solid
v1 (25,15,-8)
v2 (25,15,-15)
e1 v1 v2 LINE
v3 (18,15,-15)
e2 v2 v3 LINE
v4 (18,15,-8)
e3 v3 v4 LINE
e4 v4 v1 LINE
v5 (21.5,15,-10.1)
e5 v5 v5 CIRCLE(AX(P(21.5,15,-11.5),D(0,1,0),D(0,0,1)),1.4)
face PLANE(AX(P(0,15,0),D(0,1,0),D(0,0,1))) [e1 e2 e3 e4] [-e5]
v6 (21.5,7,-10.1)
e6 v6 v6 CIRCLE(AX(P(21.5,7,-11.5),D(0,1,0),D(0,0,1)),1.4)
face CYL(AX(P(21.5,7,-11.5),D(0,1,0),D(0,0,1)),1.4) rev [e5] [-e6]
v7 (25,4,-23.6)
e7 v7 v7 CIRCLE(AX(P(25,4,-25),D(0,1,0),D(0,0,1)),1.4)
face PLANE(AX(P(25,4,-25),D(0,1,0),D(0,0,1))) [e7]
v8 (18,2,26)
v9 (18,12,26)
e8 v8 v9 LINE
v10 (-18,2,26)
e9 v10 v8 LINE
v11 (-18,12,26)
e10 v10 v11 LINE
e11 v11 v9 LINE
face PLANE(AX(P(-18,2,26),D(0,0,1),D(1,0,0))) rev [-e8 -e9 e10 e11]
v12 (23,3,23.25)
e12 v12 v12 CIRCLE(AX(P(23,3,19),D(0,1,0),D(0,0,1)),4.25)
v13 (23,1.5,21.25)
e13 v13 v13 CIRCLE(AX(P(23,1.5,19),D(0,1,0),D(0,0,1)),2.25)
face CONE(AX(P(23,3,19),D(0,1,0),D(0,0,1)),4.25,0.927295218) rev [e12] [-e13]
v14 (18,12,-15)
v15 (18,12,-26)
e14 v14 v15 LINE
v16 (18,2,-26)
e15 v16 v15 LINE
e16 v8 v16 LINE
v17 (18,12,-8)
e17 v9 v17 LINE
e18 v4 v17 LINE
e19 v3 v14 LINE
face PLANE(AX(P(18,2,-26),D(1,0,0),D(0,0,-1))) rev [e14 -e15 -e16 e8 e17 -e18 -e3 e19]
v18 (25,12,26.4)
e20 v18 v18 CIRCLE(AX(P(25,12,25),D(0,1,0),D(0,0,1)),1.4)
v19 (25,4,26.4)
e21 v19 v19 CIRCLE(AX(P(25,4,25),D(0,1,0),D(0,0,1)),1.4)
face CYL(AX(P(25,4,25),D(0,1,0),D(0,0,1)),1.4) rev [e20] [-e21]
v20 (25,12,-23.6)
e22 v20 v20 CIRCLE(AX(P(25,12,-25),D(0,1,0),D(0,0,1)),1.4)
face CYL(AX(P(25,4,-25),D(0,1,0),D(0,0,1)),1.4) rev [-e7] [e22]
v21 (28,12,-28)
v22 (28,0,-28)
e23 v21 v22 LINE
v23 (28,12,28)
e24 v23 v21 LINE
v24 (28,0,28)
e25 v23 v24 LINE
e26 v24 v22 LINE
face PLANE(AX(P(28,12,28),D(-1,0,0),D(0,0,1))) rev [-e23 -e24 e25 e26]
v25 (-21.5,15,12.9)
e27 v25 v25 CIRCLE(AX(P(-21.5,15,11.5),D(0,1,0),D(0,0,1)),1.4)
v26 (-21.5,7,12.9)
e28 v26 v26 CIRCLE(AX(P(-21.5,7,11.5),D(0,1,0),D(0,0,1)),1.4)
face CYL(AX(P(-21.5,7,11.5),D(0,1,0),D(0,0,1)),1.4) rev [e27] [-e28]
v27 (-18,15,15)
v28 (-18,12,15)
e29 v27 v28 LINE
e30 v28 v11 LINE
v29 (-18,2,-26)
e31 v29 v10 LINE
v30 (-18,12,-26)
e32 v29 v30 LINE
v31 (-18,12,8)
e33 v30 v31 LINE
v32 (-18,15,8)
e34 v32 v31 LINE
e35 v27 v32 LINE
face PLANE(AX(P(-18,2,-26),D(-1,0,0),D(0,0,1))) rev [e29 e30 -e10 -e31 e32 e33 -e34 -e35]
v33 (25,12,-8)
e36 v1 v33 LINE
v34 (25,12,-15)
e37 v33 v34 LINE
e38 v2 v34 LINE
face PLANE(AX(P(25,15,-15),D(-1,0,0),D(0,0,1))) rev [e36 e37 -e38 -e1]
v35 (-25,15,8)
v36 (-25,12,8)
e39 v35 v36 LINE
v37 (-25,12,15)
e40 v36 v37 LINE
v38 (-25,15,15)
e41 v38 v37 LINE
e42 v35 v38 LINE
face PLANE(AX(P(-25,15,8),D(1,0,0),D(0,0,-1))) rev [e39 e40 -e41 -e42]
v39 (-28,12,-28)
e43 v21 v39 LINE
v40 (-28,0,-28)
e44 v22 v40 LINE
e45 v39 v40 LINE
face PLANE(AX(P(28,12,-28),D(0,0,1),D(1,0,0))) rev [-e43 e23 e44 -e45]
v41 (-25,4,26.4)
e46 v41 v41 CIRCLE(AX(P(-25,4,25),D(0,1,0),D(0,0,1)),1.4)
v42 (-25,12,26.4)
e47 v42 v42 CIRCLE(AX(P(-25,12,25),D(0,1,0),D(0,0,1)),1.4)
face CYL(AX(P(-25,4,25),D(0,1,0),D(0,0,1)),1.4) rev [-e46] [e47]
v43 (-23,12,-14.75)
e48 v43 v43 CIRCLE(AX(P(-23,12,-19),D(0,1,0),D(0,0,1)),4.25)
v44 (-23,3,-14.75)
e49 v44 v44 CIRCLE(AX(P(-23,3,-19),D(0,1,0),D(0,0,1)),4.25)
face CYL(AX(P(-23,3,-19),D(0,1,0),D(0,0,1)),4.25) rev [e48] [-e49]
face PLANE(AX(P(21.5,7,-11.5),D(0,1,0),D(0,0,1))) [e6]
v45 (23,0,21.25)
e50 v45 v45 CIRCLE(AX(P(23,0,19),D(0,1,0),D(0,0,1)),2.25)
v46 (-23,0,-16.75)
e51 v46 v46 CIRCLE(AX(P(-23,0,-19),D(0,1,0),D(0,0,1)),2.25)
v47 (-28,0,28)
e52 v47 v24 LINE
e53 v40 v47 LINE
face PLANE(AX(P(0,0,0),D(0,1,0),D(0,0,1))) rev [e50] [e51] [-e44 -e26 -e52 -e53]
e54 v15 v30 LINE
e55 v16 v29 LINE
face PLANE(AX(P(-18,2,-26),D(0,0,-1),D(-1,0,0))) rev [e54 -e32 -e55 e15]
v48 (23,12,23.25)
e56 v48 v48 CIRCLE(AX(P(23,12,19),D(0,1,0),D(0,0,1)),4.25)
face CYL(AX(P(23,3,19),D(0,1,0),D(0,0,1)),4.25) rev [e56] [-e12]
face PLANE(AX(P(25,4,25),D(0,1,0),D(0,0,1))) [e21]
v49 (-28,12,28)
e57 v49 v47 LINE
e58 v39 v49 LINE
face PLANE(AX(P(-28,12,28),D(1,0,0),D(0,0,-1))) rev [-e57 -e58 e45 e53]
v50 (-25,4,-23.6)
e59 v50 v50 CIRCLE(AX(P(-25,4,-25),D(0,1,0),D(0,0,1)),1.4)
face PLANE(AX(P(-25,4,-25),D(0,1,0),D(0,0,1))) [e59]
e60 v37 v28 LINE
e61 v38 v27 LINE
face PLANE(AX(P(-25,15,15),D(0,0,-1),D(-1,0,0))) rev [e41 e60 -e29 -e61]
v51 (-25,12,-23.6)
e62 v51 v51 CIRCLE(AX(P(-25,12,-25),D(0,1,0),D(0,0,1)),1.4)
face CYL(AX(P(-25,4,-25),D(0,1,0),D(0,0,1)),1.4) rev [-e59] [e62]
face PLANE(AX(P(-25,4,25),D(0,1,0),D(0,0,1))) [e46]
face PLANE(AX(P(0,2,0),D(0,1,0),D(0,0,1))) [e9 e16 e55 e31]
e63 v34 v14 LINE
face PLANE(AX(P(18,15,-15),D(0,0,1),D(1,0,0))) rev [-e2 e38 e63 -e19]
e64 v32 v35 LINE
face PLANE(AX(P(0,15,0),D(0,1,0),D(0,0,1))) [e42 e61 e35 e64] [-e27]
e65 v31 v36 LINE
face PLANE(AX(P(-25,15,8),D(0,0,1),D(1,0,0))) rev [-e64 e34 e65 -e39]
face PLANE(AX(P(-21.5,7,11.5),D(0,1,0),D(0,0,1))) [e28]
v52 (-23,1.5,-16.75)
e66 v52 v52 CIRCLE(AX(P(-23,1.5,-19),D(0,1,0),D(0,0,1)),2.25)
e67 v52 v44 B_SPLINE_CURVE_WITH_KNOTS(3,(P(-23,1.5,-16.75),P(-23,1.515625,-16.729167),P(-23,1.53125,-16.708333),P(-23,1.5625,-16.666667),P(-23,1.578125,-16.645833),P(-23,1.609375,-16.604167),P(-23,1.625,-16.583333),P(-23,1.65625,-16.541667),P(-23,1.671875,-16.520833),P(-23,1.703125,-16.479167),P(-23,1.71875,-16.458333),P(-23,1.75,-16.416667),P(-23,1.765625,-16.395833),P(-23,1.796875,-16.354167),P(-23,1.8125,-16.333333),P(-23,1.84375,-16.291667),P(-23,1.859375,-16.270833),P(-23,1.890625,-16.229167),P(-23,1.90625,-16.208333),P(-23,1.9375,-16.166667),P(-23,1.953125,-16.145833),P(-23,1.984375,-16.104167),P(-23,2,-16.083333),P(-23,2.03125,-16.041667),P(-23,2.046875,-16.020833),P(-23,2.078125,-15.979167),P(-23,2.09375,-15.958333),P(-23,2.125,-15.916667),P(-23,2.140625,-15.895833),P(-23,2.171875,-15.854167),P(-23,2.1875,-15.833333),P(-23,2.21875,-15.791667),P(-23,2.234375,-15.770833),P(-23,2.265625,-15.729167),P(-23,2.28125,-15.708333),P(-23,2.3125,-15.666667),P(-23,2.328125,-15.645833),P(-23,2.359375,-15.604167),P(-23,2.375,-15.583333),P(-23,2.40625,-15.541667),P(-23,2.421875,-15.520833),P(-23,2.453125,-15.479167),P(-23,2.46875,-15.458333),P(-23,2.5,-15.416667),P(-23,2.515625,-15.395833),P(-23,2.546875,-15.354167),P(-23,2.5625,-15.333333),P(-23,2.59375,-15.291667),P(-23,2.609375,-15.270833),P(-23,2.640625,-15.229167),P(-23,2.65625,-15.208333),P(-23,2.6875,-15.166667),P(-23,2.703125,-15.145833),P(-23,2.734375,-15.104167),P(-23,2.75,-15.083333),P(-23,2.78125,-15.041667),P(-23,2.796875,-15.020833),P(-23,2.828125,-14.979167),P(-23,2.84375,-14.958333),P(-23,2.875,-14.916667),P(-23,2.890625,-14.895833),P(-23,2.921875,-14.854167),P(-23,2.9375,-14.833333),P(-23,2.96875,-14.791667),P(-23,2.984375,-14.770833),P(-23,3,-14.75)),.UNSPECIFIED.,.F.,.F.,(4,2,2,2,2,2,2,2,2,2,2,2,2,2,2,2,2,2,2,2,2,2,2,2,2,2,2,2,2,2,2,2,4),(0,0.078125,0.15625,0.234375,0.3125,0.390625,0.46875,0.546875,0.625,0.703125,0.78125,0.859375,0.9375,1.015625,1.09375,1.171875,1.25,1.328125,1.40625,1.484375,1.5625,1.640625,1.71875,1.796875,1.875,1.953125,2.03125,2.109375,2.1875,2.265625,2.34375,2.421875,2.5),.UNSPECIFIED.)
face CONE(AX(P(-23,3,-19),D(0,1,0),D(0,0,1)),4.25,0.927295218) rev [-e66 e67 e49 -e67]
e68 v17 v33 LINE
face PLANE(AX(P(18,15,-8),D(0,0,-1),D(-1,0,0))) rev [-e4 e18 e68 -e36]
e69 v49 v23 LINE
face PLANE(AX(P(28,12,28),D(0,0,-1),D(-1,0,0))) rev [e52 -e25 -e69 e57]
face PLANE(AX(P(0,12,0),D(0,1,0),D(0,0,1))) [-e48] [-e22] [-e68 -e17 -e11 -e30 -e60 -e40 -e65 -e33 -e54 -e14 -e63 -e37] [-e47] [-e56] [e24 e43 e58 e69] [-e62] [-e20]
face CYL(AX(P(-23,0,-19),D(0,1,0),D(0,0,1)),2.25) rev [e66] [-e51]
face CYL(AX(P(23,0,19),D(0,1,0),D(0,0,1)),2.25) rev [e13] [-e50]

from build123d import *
from OCP.BRepFilletAPI import BRepFilletAPI_MakeChamfer

# Parameters (mm, degrees)
SKETCH_1_W          = 56
SKETCH_1_H          = 56
EXTRUDE_1_DEPTH     = 12
SKETCH_2_W          = 36
SKETCH_2_H          = 52
CUT_EXTRUDE_1_DEPTH = 10
SKETCH_4_W          = 7
SKETCH_4_H          = 7
EXTRUDE_3_DEPTH     = 3
SKETCH_5_R          = 1.4
CUT_EXTRUDE_3_DEPTH = 8
SKETCH_6_R          = 2.25
CUT_EXTRUDE_4_DEPTH = 42.376321731
SKETCH_7_R          = 4.25
CUT_EXTRUDE_5_DEPTH = 9
CHAMFER_1_SIZE      = 1.5
CHAMFER_1_SIZE_2    = 2
SKETCH_8_R          = 1.4
CUT_EXTRUDE_6_DEPTH = 8


with BuildPart() as part:
    # Эскиз1 → Бобышка-Вытянуть1 (new body)
    with BuildSketch(Plane(origin=(0, 0, 0), x_dir=(1, 0, 0), z_dir=(0, 1, 0))):
        Rectangle(SKETCH_1_W, SKETCH_1_H)
    extrude(amount=EXTRUDE_1_DEPTH)

    # Эскиз2 → Вырез-Вытянуть1 (cut)
    with BuildSketch(Plane(origin=(0, 12, 0), x_dir=(1, 0, 0), z_dir=(0, 1, 0))):
        Rectangle(SKETCH_2_W, SKETCH_2_H)
    extrude(amount=-CUT_EXTRUDE_1_DEPTH, mode=Mode.SUBTRACT)

    # Эскиз4 → Бобышка-Вытянуть3 (add)
    with BuildSketch(Plane(origin=(0, 12, 0), x_dir=(1, 0, 0), z_dir=(0, 1, 0))):
        with Locations((-21.5, -11.5)):
            Rectangle(SKETCH_4_W, SKETCH_4_H)
        with Locations((21.5, 11.5)):
            Rectangle(SKETCH_4_W, SKETCH_4_H)
    extrude(amount=EXTRUDE_3_DEPTH)

    # Эскиз5 → Вырез-Вытянуть3 (cut)
    with BuildSketch(Plane(origin=(0, 15, 0), x_dir=(1, 0, 0), z_dir=(0, 1, 0))):
        with Locations(Location((-21.5, -11.5, 0), (0, 0, 270))):
            Circle(SKETCH_5_R)
        with Locations(Location((21.5, 11.5, 0), (0, 0, 270))):
            Circle(SKETCH_5_R)
    extrude(amount=-CUT_EXTRUDE_3_DEPTH, mode=Mode.SUBTRACT)

    # Эскиз6 → Вырез-Вытянуть4 (cut, through all)
    with BuildSketch(Plane(origin=(0, 12, 0), x_dir=(1, 0, 0), z_dir=(0, 1, 0))):
        with Locations(Location((-23, 19, 0), (0, 0, 270))):
            Circle(SKETCH_6_R)
        with Locations(Location((23, -19, 0), (0, 0, 270))):
            Circle(SKETCH_6_R)
    extrude(amount=-CUT_EXTRUDE_4_DEPTH, mode=Mode.SUBTRACT)

    # Эскиз7 → Вырез-Вытянуть5 (cut)
    with BuildSketch(Plane(origin=(0, 12, 0), x_dir=(1, 0, 0), z_dir=(0, 1, 0))):
        with Locations(Location((-23, 19, 0), (0, 0, 270))):
            Circle(SKETCH_7_R)
        with Locations(Location((23, -19, 0), (0, 0, 270))):
            Circle(SKETCH_7_R)
    extrude(amount=-CUT_EXTRUDE_5_DEPTH, mode=Mode.SUBTRACT)

    # Фаска1
    chamfer_1_edges_1 = [part.edges().sort_by_distance(p)[0] for p in [
        (-23, 3, -21.25),
    ]]
    chamfer_1_side_1 = [part.faces().sort_by_distance(p)[0] for p in [
        (-23, 2.97, -21.25),
    ]]
    chamfer_1_edges_2 = [part.edges().sort_by_distance(p)[0] for p in [
        (23, 3, 16.75),
    ]]
    chamfer_1_side_2 = [part.faces().sort_by_distance(p)[0] for p in [
        (23, 2.97, 16.75),
    ]]
    chamfer_1 = BRepFilletAPI_MakeChamfer(part.part.solid().wrapped)
    for e in chamfer_1_edges_1:
        chamfer_1.Add(CHAMFER_1_SIZE - 0.0001, CHAMFER_1_SIZE_2 - 0.0001, e.wrapped, chamfer_1_side_1[0].wrapped)
    for e in chamfer_1_edges_2:
        chamfer_1.Add(CHAMFER_1_SIZE - 0.0001, CHAMFER_1_SIZE_2 - 0.0001, e.wrapped, chamfer_1_side_2[0].wrapped)
    add(Compound.cast(chamfer_1.Shape()), mode=Mode.REPLACE)  # a hair under: the kernel refuses the full size

    # Эскиз8 → Вырез-Вытянуть6 (cut)
    with BuildSketch(Plane(origin=(0, 12, 0), x_dir=(1, 0, 0), z_dir=(0, 1, 0))):
        with Locations(Location((-25, 25, 0), (0, 0, 270))):
            Circle(SKETCH_8_R)
        with Locations(Location((25, -25, 0), (0, 0, 270))):
            Circle(SKETCH_8_R)
        with Locations(Location((-25, -25, 0), (0, 0, 270))):
            Circle(SKETCH_8_R)
        with Locations(Location((25, 25, 0), (0, 0, 270))):
            Circle(SKETCH_8_R)
    extrude(amount=-CUT_EXTRUDE_6_DEPTH, mode=Mode.SUBTRACT)


solid = part.part
